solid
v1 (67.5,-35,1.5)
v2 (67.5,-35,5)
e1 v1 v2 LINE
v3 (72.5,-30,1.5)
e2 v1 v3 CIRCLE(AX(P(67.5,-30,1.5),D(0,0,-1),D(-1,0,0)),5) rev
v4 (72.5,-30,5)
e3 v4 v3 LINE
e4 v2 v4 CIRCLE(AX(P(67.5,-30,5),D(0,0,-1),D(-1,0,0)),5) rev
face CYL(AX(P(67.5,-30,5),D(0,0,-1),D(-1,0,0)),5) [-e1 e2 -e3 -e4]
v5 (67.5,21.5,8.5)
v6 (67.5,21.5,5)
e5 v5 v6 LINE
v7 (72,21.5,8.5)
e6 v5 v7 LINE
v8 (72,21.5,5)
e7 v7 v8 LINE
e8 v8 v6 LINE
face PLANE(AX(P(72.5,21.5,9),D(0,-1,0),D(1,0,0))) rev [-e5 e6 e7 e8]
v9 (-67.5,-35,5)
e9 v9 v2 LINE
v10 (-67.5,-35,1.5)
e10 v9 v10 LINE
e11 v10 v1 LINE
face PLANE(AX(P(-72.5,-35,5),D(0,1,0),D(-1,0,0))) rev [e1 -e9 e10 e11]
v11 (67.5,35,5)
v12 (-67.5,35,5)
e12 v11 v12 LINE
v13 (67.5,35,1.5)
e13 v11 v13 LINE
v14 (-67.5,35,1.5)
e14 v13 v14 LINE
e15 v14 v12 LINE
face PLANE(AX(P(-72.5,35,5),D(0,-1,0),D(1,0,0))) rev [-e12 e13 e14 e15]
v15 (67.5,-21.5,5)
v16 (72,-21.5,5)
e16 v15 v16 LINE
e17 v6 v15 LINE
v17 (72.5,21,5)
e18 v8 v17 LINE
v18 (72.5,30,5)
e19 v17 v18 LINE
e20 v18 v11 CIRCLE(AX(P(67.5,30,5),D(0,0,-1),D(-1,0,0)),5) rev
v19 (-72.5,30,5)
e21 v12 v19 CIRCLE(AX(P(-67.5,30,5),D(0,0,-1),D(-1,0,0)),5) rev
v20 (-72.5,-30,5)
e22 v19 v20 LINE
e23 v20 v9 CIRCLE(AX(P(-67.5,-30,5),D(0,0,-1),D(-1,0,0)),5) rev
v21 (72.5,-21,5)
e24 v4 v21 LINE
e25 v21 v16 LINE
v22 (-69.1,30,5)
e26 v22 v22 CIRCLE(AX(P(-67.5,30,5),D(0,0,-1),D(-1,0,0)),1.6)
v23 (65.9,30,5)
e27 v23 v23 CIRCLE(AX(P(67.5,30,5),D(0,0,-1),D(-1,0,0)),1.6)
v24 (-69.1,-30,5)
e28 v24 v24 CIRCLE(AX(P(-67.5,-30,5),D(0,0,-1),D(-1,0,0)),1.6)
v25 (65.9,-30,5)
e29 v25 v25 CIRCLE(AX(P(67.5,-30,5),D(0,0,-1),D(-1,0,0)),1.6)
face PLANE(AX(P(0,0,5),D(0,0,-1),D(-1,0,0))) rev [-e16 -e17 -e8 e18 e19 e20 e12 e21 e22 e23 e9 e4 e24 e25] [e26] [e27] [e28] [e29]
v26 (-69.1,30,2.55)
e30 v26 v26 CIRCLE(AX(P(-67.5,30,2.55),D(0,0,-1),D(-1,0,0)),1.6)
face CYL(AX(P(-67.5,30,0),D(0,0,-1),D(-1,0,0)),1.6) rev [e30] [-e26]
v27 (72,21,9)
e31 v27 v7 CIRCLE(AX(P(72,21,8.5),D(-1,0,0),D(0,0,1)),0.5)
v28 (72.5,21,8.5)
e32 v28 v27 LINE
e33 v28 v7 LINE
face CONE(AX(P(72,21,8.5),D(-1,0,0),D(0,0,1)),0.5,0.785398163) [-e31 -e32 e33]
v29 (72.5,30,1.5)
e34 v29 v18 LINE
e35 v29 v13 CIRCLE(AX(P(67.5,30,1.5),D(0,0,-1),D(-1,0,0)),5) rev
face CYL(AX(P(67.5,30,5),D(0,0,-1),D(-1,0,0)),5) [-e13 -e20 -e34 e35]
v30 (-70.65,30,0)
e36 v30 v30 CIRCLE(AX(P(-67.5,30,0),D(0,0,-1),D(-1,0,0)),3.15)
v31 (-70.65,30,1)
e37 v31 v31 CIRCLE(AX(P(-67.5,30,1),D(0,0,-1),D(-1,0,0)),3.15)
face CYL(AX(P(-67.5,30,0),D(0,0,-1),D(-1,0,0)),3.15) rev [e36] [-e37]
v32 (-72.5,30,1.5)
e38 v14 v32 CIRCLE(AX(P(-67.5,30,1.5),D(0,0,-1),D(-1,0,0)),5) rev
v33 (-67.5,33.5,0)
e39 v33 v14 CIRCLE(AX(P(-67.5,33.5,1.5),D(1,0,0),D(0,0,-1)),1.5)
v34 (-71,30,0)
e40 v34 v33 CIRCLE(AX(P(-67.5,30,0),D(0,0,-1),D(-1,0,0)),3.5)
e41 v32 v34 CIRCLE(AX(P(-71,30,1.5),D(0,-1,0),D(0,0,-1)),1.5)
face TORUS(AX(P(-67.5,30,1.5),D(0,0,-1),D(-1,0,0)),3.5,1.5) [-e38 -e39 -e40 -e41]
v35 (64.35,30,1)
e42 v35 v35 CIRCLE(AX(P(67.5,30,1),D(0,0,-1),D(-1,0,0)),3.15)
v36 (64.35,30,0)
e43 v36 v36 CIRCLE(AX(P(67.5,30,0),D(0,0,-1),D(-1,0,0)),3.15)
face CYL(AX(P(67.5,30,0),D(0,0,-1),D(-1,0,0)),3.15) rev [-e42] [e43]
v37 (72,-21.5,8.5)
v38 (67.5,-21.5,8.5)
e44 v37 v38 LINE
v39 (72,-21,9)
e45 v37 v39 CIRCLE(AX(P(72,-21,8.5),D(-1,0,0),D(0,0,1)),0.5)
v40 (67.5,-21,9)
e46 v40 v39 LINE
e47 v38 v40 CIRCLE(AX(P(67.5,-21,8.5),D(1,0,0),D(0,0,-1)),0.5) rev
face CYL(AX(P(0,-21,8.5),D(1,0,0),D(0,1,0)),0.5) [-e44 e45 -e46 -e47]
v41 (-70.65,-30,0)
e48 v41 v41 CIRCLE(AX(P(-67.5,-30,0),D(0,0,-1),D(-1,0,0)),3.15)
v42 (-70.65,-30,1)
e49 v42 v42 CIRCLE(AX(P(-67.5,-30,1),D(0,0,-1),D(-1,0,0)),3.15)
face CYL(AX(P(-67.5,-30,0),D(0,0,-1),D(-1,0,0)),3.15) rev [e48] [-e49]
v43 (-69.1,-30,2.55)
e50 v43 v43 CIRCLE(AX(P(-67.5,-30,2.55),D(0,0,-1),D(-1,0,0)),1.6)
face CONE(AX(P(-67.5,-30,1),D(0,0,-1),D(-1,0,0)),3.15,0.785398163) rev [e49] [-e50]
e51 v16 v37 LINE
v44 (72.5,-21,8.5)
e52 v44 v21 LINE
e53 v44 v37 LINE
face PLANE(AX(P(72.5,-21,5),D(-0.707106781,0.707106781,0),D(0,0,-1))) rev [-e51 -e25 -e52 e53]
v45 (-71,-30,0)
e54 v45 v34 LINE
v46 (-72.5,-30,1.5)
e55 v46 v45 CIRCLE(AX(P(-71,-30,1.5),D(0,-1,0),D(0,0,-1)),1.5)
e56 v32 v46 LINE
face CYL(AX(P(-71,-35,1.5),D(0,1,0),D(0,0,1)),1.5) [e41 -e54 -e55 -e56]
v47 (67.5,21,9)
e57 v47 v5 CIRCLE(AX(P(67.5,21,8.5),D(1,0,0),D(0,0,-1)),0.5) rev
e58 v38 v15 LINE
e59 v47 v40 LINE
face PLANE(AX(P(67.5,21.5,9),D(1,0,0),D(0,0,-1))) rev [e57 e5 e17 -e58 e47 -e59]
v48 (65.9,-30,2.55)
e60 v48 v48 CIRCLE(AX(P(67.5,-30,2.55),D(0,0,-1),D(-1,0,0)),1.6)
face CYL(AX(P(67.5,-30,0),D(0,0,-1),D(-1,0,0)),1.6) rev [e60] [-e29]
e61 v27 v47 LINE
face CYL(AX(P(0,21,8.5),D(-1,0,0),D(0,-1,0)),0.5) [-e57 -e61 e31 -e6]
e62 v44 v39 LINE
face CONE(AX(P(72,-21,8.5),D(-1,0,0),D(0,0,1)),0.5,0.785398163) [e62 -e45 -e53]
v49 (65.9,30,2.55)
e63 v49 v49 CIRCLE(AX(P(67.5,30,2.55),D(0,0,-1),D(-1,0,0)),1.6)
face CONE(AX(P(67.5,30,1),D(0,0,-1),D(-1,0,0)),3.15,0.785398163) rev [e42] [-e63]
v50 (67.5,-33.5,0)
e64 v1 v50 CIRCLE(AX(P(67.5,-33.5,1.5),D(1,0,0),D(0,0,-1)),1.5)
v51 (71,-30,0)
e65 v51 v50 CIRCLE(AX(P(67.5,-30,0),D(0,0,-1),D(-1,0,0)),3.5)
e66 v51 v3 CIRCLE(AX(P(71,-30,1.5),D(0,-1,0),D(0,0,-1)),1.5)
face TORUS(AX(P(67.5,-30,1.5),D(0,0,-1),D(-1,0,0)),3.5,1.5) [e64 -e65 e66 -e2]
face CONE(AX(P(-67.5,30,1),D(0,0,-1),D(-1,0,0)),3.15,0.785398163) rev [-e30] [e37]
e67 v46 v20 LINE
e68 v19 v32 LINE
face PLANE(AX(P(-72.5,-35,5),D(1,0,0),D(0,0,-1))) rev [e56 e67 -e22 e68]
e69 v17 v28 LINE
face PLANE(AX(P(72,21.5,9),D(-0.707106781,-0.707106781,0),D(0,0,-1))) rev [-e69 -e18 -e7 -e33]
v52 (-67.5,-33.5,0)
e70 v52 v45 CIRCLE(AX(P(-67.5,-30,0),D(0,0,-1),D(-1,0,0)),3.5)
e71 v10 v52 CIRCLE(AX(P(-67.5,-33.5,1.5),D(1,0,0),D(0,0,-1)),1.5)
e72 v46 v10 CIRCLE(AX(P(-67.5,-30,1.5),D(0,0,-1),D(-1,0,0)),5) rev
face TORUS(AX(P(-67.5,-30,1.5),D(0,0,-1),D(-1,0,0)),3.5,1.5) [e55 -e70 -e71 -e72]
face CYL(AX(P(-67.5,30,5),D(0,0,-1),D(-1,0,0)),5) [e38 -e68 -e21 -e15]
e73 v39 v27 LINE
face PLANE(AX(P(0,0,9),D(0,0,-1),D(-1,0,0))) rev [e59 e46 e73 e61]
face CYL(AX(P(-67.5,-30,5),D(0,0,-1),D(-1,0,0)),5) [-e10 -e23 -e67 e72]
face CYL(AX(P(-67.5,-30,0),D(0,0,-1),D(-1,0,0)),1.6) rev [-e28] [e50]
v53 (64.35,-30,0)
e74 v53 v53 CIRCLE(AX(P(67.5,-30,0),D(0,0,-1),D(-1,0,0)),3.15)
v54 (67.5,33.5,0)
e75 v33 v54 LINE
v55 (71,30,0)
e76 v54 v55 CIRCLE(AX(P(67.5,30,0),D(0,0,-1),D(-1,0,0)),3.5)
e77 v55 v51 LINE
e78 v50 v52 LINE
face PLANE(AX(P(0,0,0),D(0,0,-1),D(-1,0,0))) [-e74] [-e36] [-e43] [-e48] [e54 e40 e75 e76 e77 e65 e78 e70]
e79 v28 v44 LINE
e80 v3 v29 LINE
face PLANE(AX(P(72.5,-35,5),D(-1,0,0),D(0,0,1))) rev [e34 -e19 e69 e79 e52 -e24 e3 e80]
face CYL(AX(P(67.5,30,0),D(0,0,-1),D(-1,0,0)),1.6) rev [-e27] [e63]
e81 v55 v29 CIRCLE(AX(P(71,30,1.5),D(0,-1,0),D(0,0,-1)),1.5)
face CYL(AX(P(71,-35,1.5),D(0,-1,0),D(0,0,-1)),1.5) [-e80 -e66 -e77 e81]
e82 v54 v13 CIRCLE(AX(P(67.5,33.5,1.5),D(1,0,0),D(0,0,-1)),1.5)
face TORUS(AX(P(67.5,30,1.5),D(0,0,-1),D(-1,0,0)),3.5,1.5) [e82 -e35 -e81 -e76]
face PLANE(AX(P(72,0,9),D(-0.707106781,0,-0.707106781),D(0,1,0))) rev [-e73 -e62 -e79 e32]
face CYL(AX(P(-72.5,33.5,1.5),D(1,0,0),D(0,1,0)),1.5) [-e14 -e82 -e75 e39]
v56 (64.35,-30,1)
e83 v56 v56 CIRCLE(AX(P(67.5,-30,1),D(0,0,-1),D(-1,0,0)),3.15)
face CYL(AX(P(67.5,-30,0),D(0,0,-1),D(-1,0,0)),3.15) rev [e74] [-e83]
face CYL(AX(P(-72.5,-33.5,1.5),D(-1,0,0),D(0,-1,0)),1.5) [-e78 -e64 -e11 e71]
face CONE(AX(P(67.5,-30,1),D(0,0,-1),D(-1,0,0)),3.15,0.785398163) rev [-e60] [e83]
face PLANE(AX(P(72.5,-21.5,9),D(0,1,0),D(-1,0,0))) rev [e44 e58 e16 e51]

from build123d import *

# Parameters (mm, degrees)
SKIZZE1_W                                    = 145
SKIZZE1_H                                    = 70
AUFSATZ_LINEAR_AUSTRAGEN1_DEPTH              = 5
VERRUNDUNG1_R                                = 5
FORMSENKUNG_F_R_M3_LINSENSENKSCHRAUB_2_COUNT = 2
FORMSENKUNG_F_R_M3_LINSENSENKSCHRAUB_2_PITCH = 60
FORMSENKUNG_F_R_M3_LINSENSENKSCHRAUB_3_COUNT = 2
FORMSENKUNG_F_R_M3_LINSENSENKSCHRAUB_3_PITCH = 135
FORMSENKUNG_F_R_M3_LINSENSENKSCHRAUB_4_COUNT = 2
FORMSENKUNG_F_R_M3_LINSENSENKSCHRAUB_4_PITCH = 147.732867027
SKIZZE5_W                                    = 5
SKIZZE5_H                                    = 43
AUFSATZ_LINEAR_AUSTRAGEN2_DEPTH              = 4
VERRUNDUNG2_R                                = 0.5
FASE1_SIZE                                   = 0.5
VERRUNDUNG3_R                                = 1.5


with BuildPart() as part:
    # Skizze1 → Aufsatz-Linear austragen1 (new body)
    with BuildSketch(Plane.XY):
        Rectangle(SKIZZE1_W, SKIZZE1_H)
    extrude(amount=AUFSATZ_LINEAR_AUSTRAGEN1_DEPTH)

    # Verrundung1
    verrundung1_edges = [part.edges().sort_by_distance(p)[0] for p in [
        (72.5, -35, 2.5),
        (-72.5, -35, 2.5),
        (-72.5, 35, 2.5),
        (72.5, 35, 2.5),
    ]]
    fillet(verrundung1_edges, radius=VERRUNDUNG1_R)

    # Skizze4 → Formsenkung für M3 Linsensenkschraube mit Schlitz1 (revolve, cut)
    with BuildSketch(Plane(origin=(67.5, 30, 0), x_dir=(0, 1, 0), z_dir=(1, 0, 0))):
        Polygon((0, 0), (0, 5), (1.6, 5), (1.6, 2.55), (3.15, 1), (3.15, 0), align=None)
    formsenkung_f_r_m3_linsensenkschraube_mi = revolve(axis=Axis((67.5, 30, -6.35), (0, 0, 1)), mode=Mode.SUBTRACT)

    # Formsenkung f_r M3 Linsensenkschraub 2: Formsenkung für M3 Linsensenkschraube mit Schlitz1 ×2
    with Locations(*[(0, -i * FORMSENKUNG_F_R_M3_LINSENSENKSCHRAUB_2_PITCH, 0) for i in range(1, FORMSENKUNG_F_R_M3_LINSENSENKSCHRAUB_2_COUNT)]):
        add(formsenkung_f_r_m3_linsensenkschraube_mi, mode=Mode.SUBTRACT)

    # Formsenkung f_r M3 Linsensenkschraub 3: Formsenkung für M3 Linsensenkschraube mit Schlitz1 ×2
    with Locations(*[(-i * FORMSENKUNG_F_R_M3_LINSENSENKSCHRAUB_3_PITCH, 0, 0) for i in range(1, FORMSENKUNG_F_R_M3_LINSENSENKSCHRAUB_3_COUNT)]):
        add(formsenkung_f_r_m3_linsensenkschraube_mi, mode=Mode.SUBTRACT)

    # Formsenkung f_r M3 Linsensenkschraub 4: Formsenkung für M3 Linsensenkschraube mit Schlitz1 ×2
    with Locations(*[Vector(-0.9138115486202572, -0.4061384660534477, 0) * (i * FORMSENKUNG_F_R_M3_LINSENSENKSCHRAUB_4_PITCH) for i in range(1, FORMSENKUNG_F_R_M3_LINSENSENKSCHRAUB_4_COUNT)]):
        add(formsenkung_f_r_m3_linsensenkschraube_mi, mode=Mode.SUBTRACT)

    # Skizze5 → Aufsatz-Linear austragen2 (add)
    with BuildSketch(Plane.XY.offset(5)):
        with Locations((70, 0)):
            Rectangle(SKIZZE5_W, SKIZZE5_H)
    extrude(amount=AUFSATZ_LINEAR_AUSTRAGEN2_DEPTH)

    # Verrundung2
    verrundung2_edges = [part.edges().sort_by_distance(p)[0] for p in [
        (70, 21.5, 9),
        (70, -21.5, 9),
    ]]
    fillet(verrundung2_edges, radius=VERRUNDUNG2_R)

    # Fase1
    fase1_edges = [part.edges().sort_by_distance(p)[0] for p in [
        (72.5, 0, 9),
        (72.5, 21.5, 6.75),
        (72.5, -21.5, 6.75),
        (72.5, 21.353553391, 8.853553391),
        (72.5, -21.353553391, 8.853553391),
    ]]
    chamfer(fase1_edges, length=FASE1_SIZE - 0.0001)  # a hair under: the kernel refuses the full size

    # Verrundung3
    verrundung3_edges = [part.edges().sort_by_distance(p)[0] for p in [
        (72.5, 0, 0),
        (0, -35, 0),
        (-72.5, 0, 0),
        (0, 35, 0),
        (-71.035533906, 33.535533906, 0),
        (71.035533906, 33.535533906, 0),
        (-71.035533906, -33.535533906, 0),
        (71.035533906, -33.535533906, 0),
    ]]
    fillet(verrundung3_edges, radius=VERRUNDUNG3_R)


solid = part.part
